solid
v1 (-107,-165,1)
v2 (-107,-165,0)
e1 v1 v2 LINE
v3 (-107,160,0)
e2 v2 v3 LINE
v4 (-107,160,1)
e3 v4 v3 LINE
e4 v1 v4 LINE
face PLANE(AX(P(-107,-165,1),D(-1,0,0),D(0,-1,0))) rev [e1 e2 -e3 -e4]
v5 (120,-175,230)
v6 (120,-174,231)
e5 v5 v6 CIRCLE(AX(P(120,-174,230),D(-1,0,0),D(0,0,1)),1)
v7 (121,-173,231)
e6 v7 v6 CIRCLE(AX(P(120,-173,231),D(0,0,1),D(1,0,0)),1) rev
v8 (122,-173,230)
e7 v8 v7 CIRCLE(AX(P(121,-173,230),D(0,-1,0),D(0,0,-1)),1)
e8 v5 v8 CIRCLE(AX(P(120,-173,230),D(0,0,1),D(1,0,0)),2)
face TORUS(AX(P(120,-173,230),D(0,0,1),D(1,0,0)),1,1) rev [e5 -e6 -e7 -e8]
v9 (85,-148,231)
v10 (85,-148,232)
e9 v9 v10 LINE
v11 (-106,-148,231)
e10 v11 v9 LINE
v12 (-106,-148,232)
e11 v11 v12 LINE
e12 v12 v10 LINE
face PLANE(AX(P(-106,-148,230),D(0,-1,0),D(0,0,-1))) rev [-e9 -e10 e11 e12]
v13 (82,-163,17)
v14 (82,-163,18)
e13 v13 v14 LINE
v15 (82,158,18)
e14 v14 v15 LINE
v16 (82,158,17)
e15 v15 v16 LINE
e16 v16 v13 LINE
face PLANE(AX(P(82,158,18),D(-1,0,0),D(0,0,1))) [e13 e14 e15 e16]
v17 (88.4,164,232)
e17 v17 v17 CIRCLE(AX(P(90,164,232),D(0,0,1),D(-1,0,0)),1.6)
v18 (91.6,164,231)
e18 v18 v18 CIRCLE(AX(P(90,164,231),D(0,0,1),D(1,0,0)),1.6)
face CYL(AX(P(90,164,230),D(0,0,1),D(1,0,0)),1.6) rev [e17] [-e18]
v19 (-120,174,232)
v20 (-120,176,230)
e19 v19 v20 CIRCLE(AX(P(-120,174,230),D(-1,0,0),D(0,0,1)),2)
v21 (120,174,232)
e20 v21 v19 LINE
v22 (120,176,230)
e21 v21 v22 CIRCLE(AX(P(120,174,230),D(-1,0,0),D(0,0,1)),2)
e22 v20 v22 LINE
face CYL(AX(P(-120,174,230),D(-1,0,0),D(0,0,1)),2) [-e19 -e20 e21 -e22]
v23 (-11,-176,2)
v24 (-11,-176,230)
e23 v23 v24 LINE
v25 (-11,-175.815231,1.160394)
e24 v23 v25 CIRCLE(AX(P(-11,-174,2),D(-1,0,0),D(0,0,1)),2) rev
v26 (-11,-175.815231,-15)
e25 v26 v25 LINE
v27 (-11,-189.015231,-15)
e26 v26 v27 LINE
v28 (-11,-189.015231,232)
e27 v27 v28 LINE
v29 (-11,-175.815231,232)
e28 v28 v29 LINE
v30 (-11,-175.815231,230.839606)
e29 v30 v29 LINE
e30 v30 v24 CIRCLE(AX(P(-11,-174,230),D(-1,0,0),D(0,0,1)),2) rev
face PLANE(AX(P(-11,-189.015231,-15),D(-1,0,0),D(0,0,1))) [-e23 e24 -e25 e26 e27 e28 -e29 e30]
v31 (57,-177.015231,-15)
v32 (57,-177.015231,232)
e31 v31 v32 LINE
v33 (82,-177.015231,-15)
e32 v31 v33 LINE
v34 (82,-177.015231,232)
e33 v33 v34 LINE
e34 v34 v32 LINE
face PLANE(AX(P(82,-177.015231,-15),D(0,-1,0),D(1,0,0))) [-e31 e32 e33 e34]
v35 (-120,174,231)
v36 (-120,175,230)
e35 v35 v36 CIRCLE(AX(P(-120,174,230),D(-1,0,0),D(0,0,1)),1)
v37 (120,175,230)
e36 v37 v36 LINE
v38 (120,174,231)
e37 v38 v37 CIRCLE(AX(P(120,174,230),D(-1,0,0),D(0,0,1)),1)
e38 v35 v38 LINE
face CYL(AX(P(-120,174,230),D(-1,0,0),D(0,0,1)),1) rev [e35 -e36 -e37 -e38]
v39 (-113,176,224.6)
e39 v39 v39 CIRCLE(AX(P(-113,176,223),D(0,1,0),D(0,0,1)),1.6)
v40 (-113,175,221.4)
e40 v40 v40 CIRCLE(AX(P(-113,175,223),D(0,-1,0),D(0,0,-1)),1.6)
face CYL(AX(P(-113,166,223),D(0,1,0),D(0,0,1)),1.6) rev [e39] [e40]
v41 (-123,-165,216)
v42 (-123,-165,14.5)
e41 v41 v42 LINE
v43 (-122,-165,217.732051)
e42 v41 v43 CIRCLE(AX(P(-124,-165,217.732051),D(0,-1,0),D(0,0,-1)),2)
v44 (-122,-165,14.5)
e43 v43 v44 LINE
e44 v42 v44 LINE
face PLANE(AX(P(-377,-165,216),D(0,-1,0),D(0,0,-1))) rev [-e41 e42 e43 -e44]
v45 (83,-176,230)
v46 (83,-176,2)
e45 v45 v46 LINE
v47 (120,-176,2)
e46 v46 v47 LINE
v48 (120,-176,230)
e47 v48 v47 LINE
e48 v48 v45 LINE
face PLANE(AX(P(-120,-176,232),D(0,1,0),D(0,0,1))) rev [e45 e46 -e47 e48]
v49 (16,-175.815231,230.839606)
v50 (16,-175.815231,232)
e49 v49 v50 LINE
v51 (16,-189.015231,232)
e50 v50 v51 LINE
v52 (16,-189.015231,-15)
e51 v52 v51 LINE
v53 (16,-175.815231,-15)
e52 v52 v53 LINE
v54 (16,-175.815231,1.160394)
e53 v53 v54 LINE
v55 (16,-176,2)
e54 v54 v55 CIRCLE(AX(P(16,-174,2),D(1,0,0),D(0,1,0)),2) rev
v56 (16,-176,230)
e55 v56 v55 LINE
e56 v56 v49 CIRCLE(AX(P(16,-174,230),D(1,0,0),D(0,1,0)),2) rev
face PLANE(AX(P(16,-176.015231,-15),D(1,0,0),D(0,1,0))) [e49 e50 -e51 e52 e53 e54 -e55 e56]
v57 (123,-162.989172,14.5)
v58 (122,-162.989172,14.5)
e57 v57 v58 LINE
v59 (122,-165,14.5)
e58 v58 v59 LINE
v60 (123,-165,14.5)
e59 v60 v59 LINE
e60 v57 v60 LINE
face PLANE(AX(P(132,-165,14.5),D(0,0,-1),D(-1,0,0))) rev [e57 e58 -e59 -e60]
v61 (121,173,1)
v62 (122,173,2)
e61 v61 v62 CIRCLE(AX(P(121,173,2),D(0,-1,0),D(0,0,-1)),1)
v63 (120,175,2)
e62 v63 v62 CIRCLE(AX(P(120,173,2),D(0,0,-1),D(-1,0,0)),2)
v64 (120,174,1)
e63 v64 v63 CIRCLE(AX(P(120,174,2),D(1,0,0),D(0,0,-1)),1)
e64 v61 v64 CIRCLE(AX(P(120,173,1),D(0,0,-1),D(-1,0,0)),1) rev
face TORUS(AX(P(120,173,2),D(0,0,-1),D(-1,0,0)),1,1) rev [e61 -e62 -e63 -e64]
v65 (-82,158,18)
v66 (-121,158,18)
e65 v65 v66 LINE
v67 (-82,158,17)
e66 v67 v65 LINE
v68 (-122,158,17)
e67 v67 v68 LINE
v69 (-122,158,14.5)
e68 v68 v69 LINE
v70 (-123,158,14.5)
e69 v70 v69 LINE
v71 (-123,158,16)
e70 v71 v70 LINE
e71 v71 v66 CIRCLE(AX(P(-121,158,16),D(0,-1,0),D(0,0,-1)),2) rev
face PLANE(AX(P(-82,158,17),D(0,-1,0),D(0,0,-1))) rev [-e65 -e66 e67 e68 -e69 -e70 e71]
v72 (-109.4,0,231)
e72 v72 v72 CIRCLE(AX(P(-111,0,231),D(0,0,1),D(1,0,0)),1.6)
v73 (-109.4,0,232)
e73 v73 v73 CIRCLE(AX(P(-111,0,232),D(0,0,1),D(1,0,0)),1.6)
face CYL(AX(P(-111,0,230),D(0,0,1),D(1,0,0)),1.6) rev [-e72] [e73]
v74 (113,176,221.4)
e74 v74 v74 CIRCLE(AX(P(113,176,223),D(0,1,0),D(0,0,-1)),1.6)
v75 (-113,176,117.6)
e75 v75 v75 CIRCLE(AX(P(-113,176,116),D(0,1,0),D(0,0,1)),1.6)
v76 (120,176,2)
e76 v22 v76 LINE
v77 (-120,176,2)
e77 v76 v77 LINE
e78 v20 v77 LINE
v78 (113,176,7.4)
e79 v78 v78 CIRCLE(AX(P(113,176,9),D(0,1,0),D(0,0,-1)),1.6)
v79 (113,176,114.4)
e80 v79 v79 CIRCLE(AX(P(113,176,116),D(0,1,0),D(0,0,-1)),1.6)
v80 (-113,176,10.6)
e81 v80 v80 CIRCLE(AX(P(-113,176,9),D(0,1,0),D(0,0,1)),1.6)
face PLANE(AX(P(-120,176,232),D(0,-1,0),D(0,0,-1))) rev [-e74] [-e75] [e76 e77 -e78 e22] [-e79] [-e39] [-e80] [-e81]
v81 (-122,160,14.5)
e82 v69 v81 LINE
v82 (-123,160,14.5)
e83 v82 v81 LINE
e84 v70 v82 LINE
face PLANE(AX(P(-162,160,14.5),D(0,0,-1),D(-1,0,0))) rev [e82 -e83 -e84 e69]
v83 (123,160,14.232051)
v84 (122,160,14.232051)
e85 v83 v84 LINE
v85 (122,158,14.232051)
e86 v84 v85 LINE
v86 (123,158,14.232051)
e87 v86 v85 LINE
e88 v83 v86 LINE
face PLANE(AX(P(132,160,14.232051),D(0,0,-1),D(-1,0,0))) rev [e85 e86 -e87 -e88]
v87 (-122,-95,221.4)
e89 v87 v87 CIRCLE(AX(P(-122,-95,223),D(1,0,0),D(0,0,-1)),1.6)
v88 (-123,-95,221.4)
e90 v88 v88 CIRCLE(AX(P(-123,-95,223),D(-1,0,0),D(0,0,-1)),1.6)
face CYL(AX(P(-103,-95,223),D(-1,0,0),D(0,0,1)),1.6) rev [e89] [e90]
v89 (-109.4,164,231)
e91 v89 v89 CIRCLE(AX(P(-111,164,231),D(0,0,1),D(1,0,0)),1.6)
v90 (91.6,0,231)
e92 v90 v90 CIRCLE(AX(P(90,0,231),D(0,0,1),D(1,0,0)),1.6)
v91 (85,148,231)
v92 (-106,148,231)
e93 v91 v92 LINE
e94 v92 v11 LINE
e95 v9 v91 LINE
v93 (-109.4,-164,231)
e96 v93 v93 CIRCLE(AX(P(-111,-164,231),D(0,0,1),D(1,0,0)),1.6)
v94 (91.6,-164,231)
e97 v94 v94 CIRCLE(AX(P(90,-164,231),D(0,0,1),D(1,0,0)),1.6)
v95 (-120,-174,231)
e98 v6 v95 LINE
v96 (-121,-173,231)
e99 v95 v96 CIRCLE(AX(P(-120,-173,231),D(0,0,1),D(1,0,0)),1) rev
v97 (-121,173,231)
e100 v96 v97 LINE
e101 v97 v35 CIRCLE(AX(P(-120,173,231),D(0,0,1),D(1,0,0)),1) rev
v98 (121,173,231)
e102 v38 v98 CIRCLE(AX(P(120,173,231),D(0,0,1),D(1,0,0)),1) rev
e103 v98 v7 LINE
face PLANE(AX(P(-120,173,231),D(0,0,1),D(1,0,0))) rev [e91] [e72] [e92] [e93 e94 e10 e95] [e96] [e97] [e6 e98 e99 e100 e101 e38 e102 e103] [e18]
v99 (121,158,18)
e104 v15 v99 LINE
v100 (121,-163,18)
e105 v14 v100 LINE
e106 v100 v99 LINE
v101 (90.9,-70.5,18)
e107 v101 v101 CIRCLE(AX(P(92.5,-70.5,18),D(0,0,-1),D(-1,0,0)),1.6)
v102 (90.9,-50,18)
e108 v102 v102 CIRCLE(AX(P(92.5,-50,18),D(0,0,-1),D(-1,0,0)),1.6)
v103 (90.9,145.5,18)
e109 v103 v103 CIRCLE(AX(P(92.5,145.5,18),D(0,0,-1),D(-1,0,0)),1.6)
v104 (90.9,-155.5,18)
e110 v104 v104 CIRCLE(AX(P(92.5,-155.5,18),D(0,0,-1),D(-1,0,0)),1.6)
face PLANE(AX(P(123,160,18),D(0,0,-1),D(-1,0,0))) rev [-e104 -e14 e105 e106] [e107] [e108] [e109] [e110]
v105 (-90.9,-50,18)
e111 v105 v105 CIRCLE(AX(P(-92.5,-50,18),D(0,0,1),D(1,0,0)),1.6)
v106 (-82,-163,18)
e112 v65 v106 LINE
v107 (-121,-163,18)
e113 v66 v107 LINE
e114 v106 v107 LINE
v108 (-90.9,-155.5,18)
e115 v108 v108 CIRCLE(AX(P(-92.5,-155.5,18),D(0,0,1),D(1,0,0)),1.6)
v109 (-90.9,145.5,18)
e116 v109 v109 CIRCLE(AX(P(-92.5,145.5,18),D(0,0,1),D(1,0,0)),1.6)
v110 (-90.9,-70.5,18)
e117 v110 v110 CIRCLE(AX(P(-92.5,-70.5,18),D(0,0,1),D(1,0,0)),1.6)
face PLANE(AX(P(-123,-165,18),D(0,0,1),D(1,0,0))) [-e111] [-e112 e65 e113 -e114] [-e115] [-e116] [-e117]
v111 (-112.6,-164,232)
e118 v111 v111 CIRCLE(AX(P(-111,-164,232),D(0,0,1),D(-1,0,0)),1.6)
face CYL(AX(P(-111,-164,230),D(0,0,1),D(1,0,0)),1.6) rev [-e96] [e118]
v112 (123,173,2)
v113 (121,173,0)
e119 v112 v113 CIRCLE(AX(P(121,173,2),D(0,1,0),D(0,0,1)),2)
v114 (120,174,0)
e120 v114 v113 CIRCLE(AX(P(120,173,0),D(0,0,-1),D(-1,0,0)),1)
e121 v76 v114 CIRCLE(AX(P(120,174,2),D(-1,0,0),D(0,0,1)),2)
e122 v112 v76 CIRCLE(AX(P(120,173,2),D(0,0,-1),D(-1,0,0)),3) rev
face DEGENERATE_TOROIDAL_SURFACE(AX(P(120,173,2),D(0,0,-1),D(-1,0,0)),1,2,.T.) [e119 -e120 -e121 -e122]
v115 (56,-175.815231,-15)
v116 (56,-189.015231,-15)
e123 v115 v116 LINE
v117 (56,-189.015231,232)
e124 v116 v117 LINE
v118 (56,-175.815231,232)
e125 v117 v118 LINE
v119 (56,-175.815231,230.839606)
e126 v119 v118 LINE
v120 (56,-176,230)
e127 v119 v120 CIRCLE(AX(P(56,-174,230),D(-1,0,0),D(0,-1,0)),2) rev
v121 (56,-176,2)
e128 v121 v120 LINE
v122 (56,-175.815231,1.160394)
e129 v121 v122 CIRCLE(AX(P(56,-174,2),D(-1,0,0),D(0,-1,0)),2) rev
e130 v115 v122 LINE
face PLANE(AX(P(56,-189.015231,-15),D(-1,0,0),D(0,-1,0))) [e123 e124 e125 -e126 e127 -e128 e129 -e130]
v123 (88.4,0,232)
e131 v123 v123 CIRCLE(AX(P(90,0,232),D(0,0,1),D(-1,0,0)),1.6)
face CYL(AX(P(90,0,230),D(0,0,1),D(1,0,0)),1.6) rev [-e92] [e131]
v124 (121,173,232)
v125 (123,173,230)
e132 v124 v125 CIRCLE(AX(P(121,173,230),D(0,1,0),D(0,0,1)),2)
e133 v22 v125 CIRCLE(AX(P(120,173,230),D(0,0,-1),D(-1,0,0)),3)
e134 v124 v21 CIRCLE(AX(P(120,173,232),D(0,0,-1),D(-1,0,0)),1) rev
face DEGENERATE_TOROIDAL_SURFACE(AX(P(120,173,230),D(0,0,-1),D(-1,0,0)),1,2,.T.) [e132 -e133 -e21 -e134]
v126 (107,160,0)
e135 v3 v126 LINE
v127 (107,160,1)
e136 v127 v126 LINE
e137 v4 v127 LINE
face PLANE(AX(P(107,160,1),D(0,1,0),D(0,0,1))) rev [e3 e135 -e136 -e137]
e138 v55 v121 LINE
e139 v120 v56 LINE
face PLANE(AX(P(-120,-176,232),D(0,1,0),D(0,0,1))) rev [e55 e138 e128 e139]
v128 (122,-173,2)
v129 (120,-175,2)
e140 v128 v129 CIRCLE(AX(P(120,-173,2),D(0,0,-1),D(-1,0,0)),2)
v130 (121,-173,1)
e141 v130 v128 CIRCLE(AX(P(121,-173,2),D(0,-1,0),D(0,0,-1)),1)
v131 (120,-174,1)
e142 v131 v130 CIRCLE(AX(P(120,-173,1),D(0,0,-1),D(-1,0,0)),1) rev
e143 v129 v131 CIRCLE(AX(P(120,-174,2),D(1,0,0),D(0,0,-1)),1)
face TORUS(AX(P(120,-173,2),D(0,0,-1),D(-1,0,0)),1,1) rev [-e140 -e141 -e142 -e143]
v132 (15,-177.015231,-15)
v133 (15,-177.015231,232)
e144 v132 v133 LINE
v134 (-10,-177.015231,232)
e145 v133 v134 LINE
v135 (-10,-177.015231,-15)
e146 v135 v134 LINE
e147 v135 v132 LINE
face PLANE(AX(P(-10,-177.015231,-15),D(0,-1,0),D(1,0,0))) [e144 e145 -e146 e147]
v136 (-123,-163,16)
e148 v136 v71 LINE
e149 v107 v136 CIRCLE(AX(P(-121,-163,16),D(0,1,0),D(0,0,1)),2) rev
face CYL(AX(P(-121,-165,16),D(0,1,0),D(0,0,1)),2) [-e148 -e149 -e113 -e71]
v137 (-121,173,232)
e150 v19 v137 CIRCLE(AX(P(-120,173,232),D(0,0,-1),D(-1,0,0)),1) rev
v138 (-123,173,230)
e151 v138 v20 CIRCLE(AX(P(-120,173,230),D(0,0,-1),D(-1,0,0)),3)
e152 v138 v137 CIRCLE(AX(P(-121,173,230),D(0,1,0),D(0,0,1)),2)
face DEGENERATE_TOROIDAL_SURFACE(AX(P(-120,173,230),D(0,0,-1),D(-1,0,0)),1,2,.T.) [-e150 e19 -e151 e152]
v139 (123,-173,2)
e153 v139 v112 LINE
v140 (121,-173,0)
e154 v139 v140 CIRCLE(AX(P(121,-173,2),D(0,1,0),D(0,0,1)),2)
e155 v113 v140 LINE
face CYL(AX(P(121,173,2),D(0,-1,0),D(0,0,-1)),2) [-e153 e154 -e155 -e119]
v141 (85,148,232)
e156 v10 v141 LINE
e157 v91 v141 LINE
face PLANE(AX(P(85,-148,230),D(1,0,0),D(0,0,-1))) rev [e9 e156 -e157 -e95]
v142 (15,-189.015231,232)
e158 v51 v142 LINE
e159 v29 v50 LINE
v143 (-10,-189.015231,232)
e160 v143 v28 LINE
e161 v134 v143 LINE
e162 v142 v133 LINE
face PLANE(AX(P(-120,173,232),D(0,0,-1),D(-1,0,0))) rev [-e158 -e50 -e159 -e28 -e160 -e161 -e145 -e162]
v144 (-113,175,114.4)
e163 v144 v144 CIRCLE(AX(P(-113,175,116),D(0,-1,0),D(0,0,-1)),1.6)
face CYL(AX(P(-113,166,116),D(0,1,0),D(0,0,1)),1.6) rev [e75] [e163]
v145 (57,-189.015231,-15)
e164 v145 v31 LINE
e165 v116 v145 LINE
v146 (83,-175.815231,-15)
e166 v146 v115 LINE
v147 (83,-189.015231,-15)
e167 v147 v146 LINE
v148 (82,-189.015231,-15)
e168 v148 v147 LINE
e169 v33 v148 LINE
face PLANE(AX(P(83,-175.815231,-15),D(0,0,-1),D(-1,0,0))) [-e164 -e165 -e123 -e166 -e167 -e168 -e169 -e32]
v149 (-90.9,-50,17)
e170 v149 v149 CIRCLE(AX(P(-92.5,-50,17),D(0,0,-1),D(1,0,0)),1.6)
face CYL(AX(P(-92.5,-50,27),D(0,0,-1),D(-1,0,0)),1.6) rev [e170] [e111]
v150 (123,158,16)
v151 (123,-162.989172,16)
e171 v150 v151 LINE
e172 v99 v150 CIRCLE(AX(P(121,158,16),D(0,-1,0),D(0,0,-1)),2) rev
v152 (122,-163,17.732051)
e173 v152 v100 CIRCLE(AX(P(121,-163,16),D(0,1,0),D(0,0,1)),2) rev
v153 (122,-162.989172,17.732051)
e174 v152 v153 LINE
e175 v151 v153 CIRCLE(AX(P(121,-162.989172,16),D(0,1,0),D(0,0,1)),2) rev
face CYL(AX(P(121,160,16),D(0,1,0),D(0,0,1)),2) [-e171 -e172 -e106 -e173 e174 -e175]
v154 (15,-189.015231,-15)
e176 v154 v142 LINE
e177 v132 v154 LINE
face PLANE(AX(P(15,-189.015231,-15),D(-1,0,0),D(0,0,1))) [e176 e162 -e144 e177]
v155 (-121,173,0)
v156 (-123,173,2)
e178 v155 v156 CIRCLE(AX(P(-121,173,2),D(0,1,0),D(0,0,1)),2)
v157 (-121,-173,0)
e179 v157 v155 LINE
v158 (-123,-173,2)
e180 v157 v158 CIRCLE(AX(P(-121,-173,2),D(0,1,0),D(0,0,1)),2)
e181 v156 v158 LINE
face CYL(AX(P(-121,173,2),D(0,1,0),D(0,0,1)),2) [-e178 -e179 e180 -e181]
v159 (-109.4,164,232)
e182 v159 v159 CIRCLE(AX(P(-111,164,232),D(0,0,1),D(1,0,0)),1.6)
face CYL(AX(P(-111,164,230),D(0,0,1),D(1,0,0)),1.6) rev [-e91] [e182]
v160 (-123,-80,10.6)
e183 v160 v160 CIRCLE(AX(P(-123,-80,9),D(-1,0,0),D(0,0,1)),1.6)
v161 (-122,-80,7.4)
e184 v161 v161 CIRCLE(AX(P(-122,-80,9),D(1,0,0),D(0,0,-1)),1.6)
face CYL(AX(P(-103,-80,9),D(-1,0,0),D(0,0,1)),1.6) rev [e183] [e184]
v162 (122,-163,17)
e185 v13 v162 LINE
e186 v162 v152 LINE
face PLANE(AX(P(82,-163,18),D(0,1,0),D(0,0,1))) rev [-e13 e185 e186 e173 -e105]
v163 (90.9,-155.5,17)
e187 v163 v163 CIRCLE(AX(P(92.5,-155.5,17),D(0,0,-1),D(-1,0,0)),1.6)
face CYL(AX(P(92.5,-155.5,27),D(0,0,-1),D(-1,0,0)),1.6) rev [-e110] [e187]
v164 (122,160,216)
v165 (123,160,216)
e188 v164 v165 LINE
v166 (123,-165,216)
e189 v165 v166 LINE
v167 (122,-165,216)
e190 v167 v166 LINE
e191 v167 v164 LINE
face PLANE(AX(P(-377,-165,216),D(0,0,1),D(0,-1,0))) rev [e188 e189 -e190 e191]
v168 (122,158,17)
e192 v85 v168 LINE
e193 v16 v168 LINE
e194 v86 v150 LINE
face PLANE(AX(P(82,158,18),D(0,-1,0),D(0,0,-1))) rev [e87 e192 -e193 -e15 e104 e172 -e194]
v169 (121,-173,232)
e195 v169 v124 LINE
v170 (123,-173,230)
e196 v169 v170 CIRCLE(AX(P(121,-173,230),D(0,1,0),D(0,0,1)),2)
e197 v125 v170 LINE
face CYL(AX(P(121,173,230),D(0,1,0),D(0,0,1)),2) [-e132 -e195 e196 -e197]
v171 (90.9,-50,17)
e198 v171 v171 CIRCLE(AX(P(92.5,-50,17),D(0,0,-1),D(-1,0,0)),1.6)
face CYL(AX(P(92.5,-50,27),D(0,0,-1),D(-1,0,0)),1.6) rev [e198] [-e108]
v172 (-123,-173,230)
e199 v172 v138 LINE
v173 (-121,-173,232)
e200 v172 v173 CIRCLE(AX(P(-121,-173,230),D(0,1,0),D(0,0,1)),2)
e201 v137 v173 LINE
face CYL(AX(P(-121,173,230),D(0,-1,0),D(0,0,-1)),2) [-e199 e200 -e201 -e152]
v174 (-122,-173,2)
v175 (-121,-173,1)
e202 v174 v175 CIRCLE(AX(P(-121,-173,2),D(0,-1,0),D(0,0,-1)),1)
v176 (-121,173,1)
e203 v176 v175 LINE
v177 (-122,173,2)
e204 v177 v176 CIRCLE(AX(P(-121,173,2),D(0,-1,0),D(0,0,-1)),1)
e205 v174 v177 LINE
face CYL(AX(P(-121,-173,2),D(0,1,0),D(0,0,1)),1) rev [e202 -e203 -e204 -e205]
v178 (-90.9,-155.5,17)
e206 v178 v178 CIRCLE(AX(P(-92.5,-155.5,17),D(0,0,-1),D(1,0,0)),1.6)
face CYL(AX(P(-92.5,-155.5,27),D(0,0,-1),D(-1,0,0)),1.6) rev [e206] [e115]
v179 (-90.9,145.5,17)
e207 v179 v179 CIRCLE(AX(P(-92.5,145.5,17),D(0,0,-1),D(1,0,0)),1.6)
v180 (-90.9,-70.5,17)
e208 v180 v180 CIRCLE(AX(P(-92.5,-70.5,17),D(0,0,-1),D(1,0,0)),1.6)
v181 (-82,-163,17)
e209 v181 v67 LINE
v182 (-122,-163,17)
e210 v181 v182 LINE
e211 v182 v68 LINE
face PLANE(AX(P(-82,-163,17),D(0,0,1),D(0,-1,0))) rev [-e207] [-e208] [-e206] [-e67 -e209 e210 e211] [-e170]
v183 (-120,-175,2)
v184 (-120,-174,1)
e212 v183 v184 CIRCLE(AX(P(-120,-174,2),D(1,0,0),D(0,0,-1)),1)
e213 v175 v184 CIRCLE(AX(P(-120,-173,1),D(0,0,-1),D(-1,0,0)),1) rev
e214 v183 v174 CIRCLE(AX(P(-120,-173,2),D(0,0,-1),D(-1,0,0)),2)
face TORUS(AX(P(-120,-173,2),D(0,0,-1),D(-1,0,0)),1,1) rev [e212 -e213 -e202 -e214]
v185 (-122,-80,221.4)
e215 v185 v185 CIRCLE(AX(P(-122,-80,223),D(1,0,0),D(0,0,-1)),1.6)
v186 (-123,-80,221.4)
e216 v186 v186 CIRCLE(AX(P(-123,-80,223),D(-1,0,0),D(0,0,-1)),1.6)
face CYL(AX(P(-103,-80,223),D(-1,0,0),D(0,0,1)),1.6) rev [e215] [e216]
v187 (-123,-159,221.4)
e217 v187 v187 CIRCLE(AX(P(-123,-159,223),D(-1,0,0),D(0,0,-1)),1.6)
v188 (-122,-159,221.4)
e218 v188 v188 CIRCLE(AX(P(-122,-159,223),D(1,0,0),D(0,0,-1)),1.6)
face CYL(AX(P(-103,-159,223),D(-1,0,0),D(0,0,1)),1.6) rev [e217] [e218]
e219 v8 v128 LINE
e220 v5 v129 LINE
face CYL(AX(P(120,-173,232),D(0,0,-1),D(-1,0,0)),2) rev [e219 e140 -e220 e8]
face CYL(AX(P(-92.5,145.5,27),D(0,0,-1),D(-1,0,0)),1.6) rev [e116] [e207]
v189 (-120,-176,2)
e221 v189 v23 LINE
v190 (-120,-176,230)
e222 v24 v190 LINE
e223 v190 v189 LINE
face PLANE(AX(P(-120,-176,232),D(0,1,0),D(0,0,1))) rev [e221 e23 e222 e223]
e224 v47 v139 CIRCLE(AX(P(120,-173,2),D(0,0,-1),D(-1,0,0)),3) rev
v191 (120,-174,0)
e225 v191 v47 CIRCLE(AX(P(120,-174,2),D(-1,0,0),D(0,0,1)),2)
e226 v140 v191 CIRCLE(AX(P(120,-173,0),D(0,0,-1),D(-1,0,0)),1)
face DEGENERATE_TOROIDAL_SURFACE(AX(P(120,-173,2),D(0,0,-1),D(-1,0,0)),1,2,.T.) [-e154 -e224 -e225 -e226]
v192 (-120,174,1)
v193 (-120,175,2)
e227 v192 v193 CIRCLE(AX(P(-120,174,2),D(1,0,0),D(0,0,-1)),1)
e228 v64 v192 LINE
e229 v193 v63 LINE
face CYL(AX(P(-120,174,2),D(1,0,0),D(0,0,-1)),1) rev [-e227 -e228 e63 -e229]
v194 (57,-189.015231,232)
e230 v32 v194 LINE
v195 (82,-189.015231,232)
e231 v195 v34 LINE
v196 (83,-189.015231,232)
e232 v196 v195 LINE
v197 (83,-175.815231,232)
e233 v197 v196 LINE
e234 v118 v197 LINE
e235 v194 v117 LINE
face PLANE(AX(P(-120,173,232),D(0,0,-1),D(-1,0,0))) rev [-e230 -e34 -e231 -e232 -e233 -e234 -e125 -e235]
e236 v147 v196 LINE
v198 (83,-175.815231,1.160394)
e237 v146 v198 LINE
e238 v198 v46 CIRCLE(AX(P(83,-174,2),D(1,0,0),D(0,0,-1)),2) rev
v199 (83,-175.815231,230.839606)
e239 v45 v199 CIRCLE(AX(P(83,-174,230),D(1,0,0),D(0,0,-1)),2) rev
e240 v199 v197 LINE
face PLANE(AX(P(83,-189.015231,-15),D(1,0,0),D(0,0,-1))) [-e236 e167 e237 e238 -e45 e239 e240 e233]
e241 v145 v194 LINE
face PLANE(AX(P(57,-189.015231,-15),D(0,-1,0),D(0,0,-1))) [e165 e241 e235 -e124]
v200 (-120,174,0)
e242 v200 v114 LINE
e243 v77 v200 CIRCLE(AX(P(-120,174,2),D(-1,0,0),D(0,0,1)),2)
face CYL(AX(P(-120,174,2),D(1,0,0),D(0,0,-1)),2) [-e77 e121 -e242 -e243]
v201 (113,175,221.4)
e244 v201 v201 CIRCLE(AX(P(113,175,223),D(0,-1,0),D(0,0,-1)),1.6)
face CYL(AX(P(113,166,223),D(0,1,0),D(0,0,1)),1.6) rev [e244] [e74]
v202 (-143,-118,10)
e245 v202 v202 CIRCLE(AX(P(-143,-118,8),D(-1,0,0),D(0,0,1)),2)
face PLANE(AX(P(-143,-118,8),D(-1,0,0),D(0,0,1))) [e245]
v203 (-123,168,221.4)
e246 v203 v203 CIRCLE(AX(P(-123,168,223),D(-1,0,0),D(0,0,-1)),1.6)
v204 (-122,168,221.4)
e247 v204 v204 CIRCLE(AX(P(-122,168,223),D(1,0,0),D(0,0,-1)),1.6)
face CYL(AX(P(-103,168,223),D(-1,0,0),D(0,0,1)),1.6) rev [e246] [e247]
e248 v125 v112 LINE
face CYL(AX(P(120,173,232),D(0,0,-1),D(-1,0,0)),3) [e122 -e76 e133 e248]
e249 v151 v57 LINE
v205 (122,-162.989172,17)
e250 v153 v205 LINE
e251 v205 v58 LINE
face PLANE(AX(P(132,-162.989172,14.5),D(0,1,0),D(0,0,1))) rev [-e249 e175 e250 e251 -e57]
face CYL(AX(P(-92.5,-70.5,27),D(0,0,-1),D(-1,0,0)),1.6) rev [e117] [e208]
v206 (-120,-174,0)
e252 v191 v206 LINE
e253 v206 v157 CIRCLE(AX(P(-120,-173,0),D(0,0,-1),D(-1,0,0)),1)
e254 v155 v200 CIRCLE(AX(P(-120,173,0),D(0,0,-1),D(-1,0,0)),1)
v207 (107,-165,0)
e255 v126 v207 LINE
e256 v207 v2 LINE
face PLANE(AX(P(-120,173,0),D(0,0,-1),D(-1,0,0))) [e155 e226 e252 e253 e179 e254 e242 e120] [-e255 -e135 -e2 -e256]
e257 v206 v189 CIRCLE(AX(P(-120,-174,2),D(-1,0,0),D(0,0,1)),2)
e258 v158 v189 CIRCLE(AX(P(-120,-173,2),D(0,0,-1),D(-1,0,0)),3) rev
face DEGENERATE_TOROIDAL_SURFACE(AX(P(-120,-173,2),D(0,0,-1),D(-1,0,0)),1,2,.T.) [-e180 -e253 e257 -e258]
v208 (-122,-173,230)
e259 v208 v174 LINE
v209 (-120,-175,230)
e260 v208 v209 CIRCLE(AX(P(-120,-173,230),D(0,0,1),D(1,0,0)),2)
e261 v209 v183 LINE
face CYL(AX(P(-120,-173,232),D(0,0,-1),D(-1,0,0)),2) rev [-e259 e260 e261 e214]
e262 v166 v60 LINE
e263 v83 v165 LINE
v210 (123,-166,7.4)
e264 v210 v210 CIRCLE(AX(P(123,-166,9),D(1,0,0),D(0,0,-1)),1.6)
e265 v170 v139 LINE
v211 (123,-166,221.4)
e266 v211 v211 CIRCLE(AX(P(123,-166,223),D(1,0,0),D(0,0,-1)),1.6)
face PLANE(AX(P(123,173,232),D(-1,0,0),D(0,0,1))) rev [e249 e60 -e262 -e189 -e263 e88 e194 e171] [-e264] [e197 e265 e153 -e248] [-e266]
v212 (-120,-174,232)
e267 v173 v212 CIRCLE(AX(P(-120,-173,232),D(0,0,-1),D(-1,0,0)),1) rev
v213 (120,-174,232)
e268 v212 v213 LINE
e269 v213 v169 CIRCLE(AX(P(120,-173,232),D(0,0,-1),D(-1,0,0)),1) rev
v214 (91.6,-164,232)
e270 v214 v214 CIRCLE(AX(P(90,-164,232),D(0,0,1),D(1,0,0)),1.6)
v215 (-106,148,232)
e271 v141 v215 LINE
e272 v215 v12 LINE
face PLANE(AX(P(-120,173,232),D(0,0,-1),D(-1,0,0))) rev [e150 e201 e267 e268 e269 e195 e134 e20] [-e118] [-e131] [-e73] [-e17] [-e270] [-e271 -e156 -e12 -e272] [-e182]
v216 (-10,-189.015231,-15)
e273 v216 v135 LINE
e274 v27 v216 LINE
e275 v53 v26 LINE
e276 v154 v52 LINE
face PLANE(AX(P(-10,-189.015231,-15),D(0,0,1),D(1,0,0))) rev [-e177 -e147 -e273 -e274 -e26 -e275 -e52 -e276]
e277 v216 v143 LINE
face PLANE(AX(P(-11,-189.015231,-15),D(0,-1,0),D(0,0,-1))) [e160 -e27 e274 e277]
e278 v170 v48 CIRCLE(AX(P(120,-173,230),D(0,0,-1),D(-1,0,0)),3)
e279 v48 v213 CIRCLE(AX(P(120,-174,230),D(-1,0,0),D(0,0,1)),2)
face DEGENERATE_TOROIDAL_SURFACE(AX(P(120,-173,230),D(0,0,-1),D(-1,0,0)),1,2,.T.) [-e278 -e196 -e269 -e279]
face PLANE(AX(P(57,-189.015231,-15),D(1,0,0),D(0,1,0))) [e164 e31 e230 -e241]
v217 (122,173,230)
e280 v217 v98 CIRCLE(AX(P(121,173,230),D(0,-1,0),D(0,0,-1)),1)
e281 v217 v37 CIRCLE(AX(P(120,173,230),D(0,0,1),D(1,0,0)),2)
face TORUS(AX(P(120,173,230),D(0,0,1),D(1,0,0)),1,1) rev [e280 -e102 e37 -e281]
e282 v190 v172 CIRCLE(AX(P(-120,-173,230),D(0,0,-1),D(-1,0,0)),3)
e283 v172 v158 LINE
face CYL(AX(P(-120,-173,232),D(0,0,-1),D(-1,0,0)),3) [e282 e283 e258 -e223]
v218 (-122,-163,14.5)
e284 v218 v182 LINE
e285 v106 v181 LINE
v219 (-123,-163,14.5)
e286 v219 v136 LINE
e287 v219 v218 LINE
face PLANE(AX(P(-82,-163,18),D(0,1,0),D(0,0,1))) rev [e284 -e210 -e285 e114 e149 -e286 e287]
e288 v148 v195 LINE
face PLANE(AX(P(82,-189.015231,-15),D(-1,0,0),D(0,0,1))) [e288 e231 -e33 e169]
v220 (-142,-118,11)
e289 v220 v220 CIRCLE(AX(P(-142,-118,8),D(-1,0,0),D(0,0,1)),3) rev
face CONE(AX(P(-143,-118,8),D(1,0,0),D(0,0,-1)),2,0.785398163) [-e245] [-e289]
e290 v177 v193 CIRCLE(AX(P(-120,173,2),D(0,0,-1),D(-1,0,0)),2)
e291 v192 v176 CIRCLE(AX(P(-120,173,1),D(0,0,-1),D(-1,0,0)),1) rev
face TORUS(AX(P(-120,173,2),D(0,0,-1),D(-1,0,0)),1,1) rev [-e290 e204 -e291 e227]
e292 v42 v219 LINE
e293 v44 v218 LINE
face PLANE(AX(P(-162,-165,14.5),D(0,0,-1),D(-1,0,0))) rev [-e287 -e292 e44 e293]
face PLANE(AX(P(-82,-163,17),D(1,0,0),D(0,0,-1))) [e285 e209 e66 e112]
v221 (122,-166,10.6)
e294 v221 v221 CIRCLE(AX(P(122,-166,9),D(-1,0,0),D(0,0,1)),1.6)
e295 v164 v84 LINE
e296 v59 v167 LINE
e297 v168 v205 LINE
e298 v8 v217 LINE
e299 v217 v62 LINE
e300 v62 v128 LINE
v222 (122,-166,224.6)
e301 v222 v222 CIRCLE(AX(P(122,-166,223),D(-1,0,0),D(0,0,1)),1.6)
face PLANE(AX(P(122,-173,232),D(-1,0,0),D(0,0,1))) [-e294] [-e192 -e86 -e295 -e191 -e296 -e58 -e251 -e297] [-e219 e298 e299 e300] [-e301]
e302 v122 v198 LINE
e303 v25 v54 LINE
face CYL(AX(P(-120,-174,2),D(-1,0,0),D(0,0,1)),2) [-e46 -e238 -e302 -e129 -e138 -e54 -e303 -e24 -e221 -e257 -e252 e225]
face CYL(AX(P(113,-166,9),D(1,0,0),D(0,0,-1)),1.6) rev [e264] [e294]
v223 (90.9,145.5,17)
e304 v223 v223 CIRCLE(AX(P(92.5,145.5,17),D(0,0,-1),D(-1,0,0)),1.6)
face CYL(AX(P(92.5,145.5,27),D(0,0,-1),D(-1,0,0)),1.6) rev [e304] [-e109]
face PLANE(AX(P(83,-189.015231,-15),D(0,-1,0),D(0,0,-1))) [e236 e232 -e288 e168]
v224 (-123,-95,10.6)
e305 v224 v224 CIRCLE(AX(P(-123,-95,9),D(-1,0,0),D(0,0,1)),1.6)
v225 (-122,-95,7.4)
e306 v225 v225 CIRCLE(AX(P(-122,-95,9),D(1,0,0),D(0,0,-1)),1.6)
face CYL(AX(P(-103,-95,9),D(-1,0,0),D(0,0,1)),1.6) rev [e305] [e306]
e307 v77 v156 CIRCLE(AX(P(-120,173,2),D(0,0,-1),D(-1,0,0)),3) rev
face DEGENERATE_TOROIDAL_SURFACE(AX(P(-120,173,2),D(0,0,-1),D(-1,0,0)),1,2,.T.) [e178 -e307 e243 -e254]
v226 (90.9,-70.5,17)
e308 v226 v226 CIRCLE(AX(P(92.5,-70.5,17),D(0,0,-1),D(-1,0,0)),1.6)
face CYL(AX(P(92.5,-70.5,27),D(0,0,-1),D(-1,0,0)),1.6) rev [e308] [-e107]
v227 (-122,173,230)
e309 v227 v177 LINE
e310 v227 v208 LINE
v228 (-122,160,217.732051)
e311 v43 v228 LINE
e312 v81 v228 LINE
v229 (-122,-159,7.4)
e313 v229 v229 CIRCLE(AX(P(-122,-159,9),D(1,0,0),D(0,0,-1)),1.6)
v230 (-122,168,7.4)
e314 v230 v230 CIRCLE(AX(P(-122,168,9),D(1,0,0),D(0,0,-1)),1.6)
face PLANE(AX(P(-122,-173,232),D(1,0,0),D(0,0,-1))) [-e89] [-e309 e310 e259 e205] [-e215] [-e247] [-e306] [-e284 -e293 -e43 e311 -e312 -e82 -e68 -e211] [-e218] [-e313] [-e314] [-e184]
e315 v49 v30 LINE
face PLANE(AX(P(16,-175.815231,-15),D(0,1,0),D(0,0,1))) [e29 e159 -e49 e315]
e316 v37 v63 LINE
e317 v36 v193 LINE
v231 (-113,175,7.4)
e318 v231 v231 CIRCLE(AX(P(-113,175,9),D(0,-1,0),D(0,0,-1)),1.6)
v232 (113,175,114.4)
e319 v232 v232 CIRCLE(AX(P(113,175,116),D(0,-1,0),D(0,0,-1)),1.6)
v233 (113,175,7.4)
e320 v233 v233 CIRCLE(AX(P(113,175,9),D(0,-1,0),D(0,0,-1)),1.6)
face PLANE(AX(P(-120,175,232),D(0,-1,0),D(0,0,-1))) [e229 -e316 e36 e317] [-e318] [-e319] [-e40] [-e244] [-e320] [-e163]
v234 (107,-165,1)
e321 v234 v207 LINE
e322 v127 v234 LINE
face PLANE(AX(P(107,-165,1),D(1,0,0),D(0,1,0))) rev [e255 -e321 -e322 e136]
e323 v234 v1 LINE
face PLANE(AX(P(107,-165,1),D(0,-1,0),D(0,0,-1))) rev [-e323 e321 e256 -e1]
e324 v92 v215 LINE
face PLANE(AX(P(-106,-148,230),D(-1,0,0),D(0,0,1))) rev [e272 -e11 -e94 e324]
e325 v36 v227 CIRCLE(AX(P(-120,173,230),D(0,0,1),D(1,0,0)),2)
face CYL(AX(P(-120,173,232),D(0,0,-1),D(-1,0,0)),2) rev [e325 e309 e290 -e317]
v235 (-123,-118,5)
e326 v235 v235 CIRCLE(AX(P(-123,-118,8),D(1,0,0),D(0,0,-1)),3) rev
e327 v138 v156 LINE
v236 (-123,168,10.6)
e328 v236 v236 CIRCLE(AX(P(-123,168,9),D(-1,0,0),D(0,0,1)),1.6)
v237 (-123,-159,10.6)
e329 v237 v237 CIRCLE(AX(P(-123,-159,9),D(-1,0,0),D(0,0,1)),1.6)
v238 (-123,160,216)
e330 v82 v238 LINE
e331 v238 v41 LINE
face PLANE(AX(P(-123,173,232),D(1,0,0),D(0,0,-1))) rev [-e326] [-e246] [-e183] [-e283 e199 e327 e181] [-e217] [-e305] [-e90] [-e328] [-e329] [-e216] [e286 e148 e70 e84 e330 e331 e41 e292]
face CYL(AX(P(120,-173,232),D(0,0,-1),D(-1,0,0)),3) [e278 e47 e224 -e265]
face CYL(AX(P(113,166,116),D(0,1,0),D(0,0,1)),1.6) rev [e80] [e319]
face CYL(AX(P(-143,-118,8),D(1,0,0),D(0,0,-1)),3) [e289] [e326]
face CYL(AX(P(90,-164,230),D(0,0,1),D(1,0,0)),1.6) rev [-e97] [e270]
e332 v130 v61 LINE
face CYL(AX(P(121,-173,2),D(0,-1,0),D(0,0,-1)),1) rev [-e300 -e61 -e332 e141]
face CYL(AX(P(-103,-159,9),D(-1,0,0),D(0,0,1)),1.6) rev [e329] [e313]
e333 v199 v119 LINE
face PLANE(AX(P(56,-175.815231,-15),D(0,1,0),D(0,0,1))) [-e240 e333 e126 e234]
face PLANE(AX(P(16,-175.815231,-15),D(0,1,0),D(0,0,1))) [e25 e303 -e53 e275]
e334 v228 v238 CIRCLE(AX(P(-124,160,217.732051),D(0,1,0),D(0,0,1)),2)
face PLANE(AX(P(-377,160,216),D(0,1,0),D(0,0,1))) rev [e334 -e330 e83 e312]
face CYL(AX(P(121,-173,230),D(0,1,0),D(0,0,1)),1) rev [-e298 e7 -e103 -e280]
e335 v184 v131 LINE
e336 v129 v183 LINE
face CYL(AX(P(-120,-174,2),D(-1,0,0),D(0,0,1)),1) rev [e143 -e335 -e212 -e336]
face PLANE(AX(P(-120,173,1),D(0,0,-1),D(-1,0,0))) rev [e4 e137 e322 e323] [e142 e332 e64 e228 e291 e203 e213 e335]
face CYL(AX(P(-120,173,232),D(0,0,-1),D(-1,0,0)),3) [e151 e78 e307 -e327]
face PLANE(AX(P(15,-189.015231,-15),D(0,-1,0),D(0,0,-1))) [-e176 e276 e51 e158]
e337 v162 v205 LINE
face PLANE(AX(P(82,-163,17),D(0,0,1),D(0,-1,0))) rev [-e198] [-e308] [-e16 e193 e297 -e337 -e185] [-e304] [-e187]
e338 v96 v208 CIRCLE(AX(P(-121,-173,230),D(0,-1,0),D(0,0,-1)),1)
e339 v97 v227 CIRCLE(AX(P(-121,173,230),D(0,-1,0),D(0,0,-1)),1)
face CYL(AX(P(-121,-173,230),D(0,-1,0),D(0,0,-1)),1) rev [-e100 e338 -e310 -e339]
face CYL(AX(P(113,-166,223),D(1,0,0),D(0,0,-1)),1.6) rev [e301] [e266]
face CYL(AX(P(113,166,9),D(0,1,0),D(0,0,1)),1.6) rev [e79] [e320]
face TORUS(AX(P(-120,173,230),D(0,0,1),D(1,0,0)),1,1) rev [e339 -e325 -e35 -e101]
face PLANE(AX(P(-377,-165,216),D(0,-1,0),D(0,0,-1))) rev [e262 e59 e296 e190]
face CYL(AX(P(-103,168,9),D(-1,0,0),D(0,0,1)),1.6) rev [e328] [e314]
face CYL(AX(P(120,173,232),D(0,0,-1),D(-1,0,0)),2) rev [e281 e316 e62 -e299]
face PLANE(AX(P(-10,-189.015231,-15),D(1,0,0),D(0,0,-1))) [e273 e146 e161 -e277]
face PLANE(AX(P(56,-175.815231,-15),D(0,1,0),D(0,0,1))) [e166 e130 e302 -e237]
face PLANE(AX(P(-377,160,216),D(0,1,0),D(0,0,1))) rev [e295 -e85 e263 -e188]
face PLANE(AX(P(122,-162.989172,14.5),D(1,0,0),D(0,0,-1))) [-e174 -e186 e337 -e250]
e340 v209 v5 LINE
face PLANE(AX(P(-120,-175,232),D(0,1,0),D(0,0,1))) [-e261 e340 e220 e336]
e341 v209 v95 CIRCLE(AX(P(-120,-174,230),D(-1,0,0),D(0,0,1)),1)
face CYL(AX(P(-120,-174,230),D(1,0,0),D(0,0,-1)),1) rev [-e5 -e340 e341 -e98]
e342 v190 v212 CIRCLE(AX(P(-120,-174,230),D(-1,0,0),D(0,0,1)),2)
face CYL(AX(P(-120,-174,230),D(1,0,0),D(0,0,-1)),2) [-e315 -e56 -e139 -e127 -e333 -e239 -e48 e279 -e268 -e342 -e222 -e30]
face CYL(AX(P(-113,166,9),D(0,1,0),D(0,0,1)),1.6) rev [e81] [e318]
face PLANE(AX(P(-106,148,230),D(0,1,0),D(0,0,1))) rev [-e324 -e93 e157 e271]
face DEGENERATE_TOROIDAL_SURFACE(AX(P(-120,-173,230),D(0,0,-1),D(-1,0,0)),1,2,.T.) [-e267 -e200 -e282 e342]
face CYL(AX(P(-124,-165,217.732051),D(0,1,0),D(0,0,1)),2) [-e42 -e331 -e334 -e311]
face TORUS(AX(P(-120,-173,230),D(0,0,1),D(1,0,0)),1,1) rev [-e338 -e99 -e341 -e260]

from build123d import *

# Parameters (mm, degrees)
EXTRUDE_1_DEPTH             = 232
SKETCH_2_W                  = 200
SKETCH_2_H                  = 325
CUT_EXTRUDE_1_DEPTH         = 500
EXTRUDE_START               = -1
EXTRUDE_1_2_DEPTH           = 1
SKETCH_4_W                  = 214
SKETCH_4_H                  = 325
EXTRUDE_2_DEPTH             = 1
FILLET_1_R                  = 1
FILLET_2_R                  = 2
SKETCH_6_R                  = 3
EXTRUDE_3_DEPTH             = 20
CHAMFER_1_SIZE              = 1
SKETCH_7_R                  = 1.6
CUT_EXTRUDE_3_DEPTH         = 20
SKETCH_8_W                  = 191
SKETCH_8_H                  = 296
CUT_EXTRUDE_4_DEPTH         = 2
SKETCH_9_R                  = 1.6
CUT_EXTRUDE_5_DEPTH         = 2
EXTRUDE_6_REACH             = 396.406
EXTRUDE_6_DIRECTION_2_DEPTH = 15
SKETCH_16_W                 = 1
SKETCH_16_H                 = 325
EXTRUDE_9_DEPTH             = 2
SKETCH_17_W                 = 1
SKETCH_17_H                 = 321
EXTRUDE_10_DEPTH            = 40
SKETCH_18_W                 = 1
SKETCH_18_H                 = 321
EXTRUDE_11_DEPTH            = 40
SKETCH_19_W                 = 3.5
SKETCH_19_H                 = 2
CUT_EXTRUDE_8_DEPTH         = 40
SKETCH_20_R                 = 1.6
CUT_EXTRUDE_9_DEPTH         = 10
FILLET_4_R                  = 2
SKETCH_22_W                 = 4.75100146
SKETCH_22_H                 = 2.010828375
SKETCH_22_W_2               = 3.5
SKETCH_22_H_2               = 2
CUT_EXTRUDE_11_DEPTH        = 10
SKETCH_23_R                 = 1.6
CUT_EXTRUDE_12_DEPTH        = 10
SKETCH_24_R                 = 1.6
CUT_EXTRUDE_13_DEPTH        = 10


with BuildPart() as part:
    # Эскиз1 → Extrude 1 (new body)
    with BuildSketch(Plane.XY):
        with BuildLine():
            Line((123, -173), (123, 173))
            ThreePointArc((123, 173), (122.121320344, 175.121320344), (120, 176))
            Line((120, 176), (-120, 176))
            ThreePointArc((-120, 176), (-122.121320344, 175.121320344), (-123, 173))
            Line((-123, 173), (-123, -173))
            ThreePointArc((-123, -173), (-122.121320344, -175.121320344), (-120, -176))
            Line((-120, -176), (120, -176))
            ThreePointArc((120, -176), (122.121320344, -175.121320344), (123, -173))
        make_face()
        with BuildLine():
            Line((122, -173), (122, 173))
            ThreePointArc((122, 173), (121.414213562, 174.414213562), (120, 175))
            Line((120, 175), (-120, 175))
            ThreePointArc((-120, 175), (-121.414213562, 174.414213562), (-122, 173))
            Line((-122, 173), (-122, -173))
            ThreePointArc((-122, -173), (-121.414213562, -174.414213562), (-120, -175))
            Line((-120, -175), (120, -175))
            ThreePointArc((120, -175), (121.414213562, -174.414213562), (122, -173))
        make_face(mode=Mode.SUBTRACT)
    extrude(amount=EXTRUDE_1_DEPTH)

    # Эскиз2 → Вырез-Вытянуть1 (cut)
    with BuildSketch(Plane(origin=(123, 0, 0), x_dir=(0, 0, -1), z_dir=(1, 0, 0))):
        with Locations((-116, -2.5)):
            Rectangle(SKETCH_2_W, SKETCH_2_H)
    extrude(amount=-CUT_EXTRUDE_1_DEPTH, mode=Mode.SUBTRACT)

    # Эскиз3 → Extrude 1 2 (add)
    with BuildSketch(Plane.XY.offset(232).offset(EXTRUDE_START)):
        with BuildLine():
            Line((-123, 173), (-123, -173))
            ThreePointArc((-123, -173), (-122.121320344, -175.121320344), (-120, -176))
            Line((-120, -176), (120, -176))
            ThreePointArc((120, -176), (122.121320344, -175.121320344), (123, -173))
            Line((123, -173), (123, 173))
            ThreePointArc((123, 173), (122.121320344, 175.121320344), (120, 176))
            Line((120, 176), (-120, 176))
            ThreePointArc((-120, 176), (-122.121320344, 175.121320344), (-123, 173))
        make_face()
    extrude(amount=EXTRUDE_1_2_DEPTH)

    # Эскиз4 → Вытянуть2 (add)
    with BuildSketch(Plane(origin=(0, 0, 0), x_dir=(-1, 0, 0), z_dir=(0, 0, -1))):
        with BuildLine():
            Line((120, 176), (-120, 176))
            ThreePointArc((-120, 176), (-122.121320344, 175.121320344), (-123, 173))
            Line((-123, 173), (-123, -173))
            ThreePointArc((-123, -173), (-122.121320344, -175.121320344), (-120, -176))
            Line((-120, -176), (120, -176))
            ThreePointArc((120, -176), (122.121320344, -175.121320344), (123, -173))
            Line((123, -173), (123, 173))
            ThreePointArc((123, 173), (122.121320344, 175.121320344), (120, 176))
        make_face()
        with Locations((0, -2.5)):
            Rectangle(SKETCH_4_W, SKETCH_4_H, mode=Mode.SUBTRACT)
    extrude(amount=-EXTRUDE_2_DEPTH)

    # Скругление1
    fillet_1_edges = [part.edges().sort_by_distance(p)[0] for p in [
        (-122, 0, 1),
        (-121.414213562, 174.414213562, 1),
        (0, 175, 1),
        (121.414213562, 174.414213562, 1),
        (122, 0, 1),
        (121.414213562, -174.414213562, 1),
        (0, -175, 1),
        (-121.414213562, -174.414213562, 1),
        (0, 175, 231),
        (-121.414213562, 174.414213562, 231),
        (-122, 0, 231),
        (-121.414213562, -174.414213562, 231),
        (0, -175, 231),
        (121.414213562, -174.414213562, 231),
        (122, 0, 231),
        (121.414213562, 174.414213562, 231),
    ]]
    fillet(fillet_1_edges, radius=FILLET_1_R)

    # Скругление2
    fillet_2_edges = [part.edges().sort_by_distance(p)[0] for p in [
        (-122.121320344, -175.121320344, 232),
        (0, -176, 232),
        (122.121320344, -175.121320344, 232),
        (123, 0, 232),
        (122.121320344, 175.121320344, 232),
        (0, 176, 232),
        (-122.121320344, 175.121320344, 232),
        (0, 176, 0),
        (122.121320344, 175.121320344, 0),
        (123, 0, 0),
        (122.121320344, -175.121320344, 0),
        (0, -176, 0),
        (-122.121320344, -175.121320344, 0),
        (-123, 0, 0),
        (-122.121320344, 175.121320344, 0),
        (-123, 0, 232),
    ]]
    fillet(fillet_2_edges, radius=FILLET_2_R)

    # Эскиз6 → Вытянуть3 (add)
    with BuildSketch(Plane.ZY.offset(123)):
        with Locations(Location((8, -118, 0), (0, 0, 180))):
            Circle(SKETCH_6_R)
    extrude(amount=EXTRUDE_3_DEPTH)

    # Фаска1
    chamfer_1_edges = [part.edges().sort_by_distance(p)[0] for p in [
        (-143, -118, 11),
    ]]
    chamfer(chamfer_1_edges, length=CHAMFER_1_SIZE)

    # Эскиз7 → Вырез-Вытянуть3 (cut)
    with BuildSketch(Plane.ZY.offset(123)):
        with Locations((9, -95)):
            Circle(SKETCH_7_R)
        with Locations((9, -159)):
            Circle(SKETCH_7_R)
        with Locations(Location((223, -95, 0), (0, 0, 180))):
            Circle(SKETCH_7_R)
        with Locations(Location((223, -159, 0), (0, 0, 180))):
            Circle(SKETCH_7_R)
        with Locations((9, -80)):
            Circle(SKETCH_7_R)
        with Locations(Location((223, -80, 0), (0, 0, 180))):
            Circle(SKETCH_7_R)
        with Locations((9, 168)):
            Circle(SKETCH_7_R)
        with Locations(Location((223, 168, 0), (0, 0, 180))):
            Circle(SKETCH_7_R)
    extrude(amount=-CUT_EXTRUDE_3_DEPTH, mode=Mode.SUBTRACT)

    # Эскиз8 → Вырез-Вытянуть4 (cut)
    with BuildSketch(Plane.XY.offset(232)):
        with Locations((-10.5, 0)):
            Rectangle(SKETCH_8_W, SKETCH_8_H)
    extrude(amount=-CUT_EXTRUDE_4_DEPTH, mode=Mode.SUBTRACT)

    # Эскиз9 → Вырез-Вытянуть5 (cut)
    with BuildSketch(Plane.XY.offset(232)):
        with Locations((-111, 164)):
            Circle(SKETCH_9_R)
        with Locations((-111, 0)):
            Circle(SKETCH_9_R)
        with Locations((-111, -164)):
            Circle(SKETCH_9_R)
        with Locations((90, -164)):
            Circle(SKETCH_9_R)
        with Locations((90, 0)):
            Circle(SKETCH_9_R)
        with Locations((90, 164)):
            Circle(SKETCH_9_R)
    extrude(amount=-CUT_EXTRUDE_5_DEPTH, mode=Mode.SUBTRACT)

    # Вытянуть6: up to this face of the body (flat: up to its plane)
    extrude_6_end = Plane(part.part.faces().sort_by_distance((-117.709874725, -170.709874725, 232))[0])
    # Эскиз10 → Вытянуть6 (add, up to the picked face)
    with BuildSketch(Plane(origin=(123, 0, 0), x_dir=(1, 0, 0), z_dir=(0, 0, 1)), mode=Mode.PRIVATE) as extrude_6_sk1:
        Polygon((-134, -176.015230639), (-134, -175.815230639), (-107, -175.815230639), (-107, -176.015230639), (-107, -189.015230639), (-108, -189.015230639), (-108, -177.015230639), (-133, -177.015230639), (-133, -189.015230639), (-134, -189.015230639), align=None)
    extrude_6_tool1 = split(extrude(extrude_6_sk1.sketch, amount=EXTRUDE_6_REACH, mode=Mode.PRIVATE), bisect_by=extrude_6_end, keep=Keep.BOTH, mode=Mode.PRIVATE)
    # Эскиз10 → Вытянуть6 (add, up to the picked face)
    with BuildSketch(Plane(origin=(123, 0, 0), x_dir=(1, 0, 0), z_dir=(0, 0, 1)), mode=Mode.PRIVATE) as extrude_6_sk2:
        Polygon((-67, -176.015230639), (-67, -175.815230639), (-40, -175.815230639), (-40, -176.015230639), (-40, -189.015230639), (-41, -189.015230639), (-41, -177.015230639), (-66, -177.015230639), (-66, -189.015230639), (-67, -189.015230639), align=None)
    extrude_6_tool2 = split(extrude(extrude_6_sk2.sketch, amount=EXTRUDE_6_REACH, mode=Mode.PRIVATE), bisect_by=extrude_6_end, keep=Keep.BOTH, mode=Mode.PRIVATE)
    add(extrude_6_tool1.solids().sort_by(Axis((-10.69946, -175.915231, 0), (0, 0, 1)))[0])
    add(extrude_6_tool2.solids().sort_by(Axis((56.30054, -175.915231, 0), (0, 0, 1)))[0])

    # Эскиз10 → Вытянуть6 direction 2 (add)
    with BuildSketch(Plane(origin=(123, 0, 0), x_dir=(1, 0, 0), z_dir=(0, 0, 1))):
        Polygon((-134, -176.015230639), (-134, -175.815230639), (-107, -175.815230639), (-107, -176.015230639), (-107, -189.015230639), (-108, -189.015230639), (-108, -177.015230639), (-133, -177.015230639), (-133, -189.015230639), (-134, -189.015230639), align=None)
        Polygon((-67, -176.015230639), (-67, -175.815230639), (-40, -175.815230639), (-40, -176.015230639), (-40, -189.015230639), (-41, -189.015230639), (-41, -177.015230639), (-66, -177.015230639), (-66, -189.015230639), (-67, -189.015230639), align=None)
    extrude(amount=-EXTRUDE_6_DIRECTION_2_DEPTH)

    # Эскиз16 → Вытянуть9 (add)
    with BuildSketch(Plane.XY.offset(16)):
        with Locations((122.5, -2.5)):
            Rectangle(SKETCH_16_W, SKETCH_16_H)
        with Locations((-122.5, -2.5)):
            Rectangle(SKETCH_16_W, SKETCH_16_H)
    extrude(amount=EXTRUDE_9_DEPTH)

    # Эскиз17 → Вытянуть10 (add)
    with BuildSketch(Plane.ZY.offset(-122)):
        with Locations((17.5, -2.5)):
            Rectangle(SKETCH_17_W, SKETCH_17_H)
    extrude(amount=EXTRUDE_10_DEPTH)

    # Эскиз18 → Вытянуть11 (add)
    with BuildSketch(Plane(origin=(-122, 0, 0), x_dir=(0, 0, -1), z_dir=(1, 0, 0))):
        with Locations((-17.5, -2.5)):
            Rectangle(SKETCH_18_W, SKETCH_18_H)
    extrude(amount=EXTRUDE_11_DEPTH)

    # Эскиз19 → Вырез-Вытянуть8 (cut)
    with BuildSketch(Plane(origin=(-122, 0, 0), x_dir=(0, 0, -1), z_dir=(1, 0, 0))):
        with Locations((-16.25, -164)):
            Rectangle(SKETCH_19_W, SKETCH_19_H)
        with Locations((-16.25, 159)):
            Rectangle(SKETCH_19_W, SKETCH_19_H)
    extrude(amount=-CUT_EXTRUDE_8_DEPTH, mode=Mode.SUBTRACT)

    # Эскиз20 → Вырез-Вытянуть9 (cut)
    with BuildSketch(Plane(origin=(0, 0, 17), x_dir=(-1, 0, 0), z_dir=(0, 0, -1))):
        with Locations((-92.5, 145.5)):
            Circle(SKETCH_20_R)
        with Locations((-92.5, -50)):
            Circle(SKETCH_20_R)
        with Locations((-92.5, -155.5)):
            Circle(SKETCH_20_R)
        with Locations(Location((92.5, -155.5, 0), (0, 0, 180))):
            Circle(SKETCH_20_R)
        with Locations(Location((92.5, -50, 0), (0, 0, 180))):
            Circle(SKETCH_20_R)
        with Locations(Location((92.5, 145.5, 0), (0, 0, 180))):
            Circle(SKETCH_20_R)
        with Locations((-92.5, -70.5)):
            Circle(SKETCH_20_R)
        with Locations(Location((92.5, -70.5, 0), (0, 0, 180))):
            Circle(SKETCH_20_R)
    extrude(amount=-CUT_EXTRUDE_9_DEPTH, mode=Mode.SUBTRACT)

    # Скругление4
    # the kernel refuses this fillet: 2 mm, written as the material it takes off along each edge
    with BuildSketch(Plane(origin=(123, -165, 18), x_dir=(0, 0, -1), z_dir=(0, 1, 0))) as fillet_4_piece_1:
        with BuildLine():
            CenterArc((FILLET_4_R, FILLET_4_R), FILLET_4_R, 180, 90)
            Line((0, FILLET_4_R), (0, 0))
            Line((0, 0), (FILLET_4_R, 0))
        make_face()
    extrude(amount=325, mode=Mode.SUBTRACT)
    with BuildSketch(Plane(origin=(-123, 158, 18), x_dir=(0, 0, -1), z_dir=(0, -1, 0))) as fillet_4_piece_2_section:
        with BuildLine():
            CenterArc((FILLET_4_R, FILLET_4_R), FILLET_4_R, 180, 90)
            Line((0, FILLET_4_R), (0, 0))
            Line((0, 0), (FILLET_4_R, 0))
        make_face()
    fillet_4_piece_2 = extrude(amount=326, mode=Mode.PRIVATE)
    fillet_4_piece_2 = split(fillet_4_piece_2, bisect_by=Plane(origin=(-122.64320814, -165, 17.511950301), z_dir=(0, 1, 0)), keep=Keep.TOP, mode=Mode.PRIVATE)
    add(fillet_4_piece_2, mode=Mode.SUBTRACT)
    with BuildSketch(Plane(origin=(-122, 160, 216), x_dir=(-1, 0, 0), z_dir=(0, -1, 0))) as fillet_4_piece_3:
        with BuildLine():
            CenterArc((2, -1.732050808), FILLET_4_R, 120, 60)
            Line((0, -1.732050808), (0, 0))
            Line((0, 0), (1, 0))
        make_face()
    extrude(amount=325, mode=Mode.SUBTRACT)

    # Эскиз22 → Вырез-Вытянуть11 (cut)
    with BuildSketch(Plane.ZY.offset(-122)):
        with Locations((16.87550073, -163.994585813)):
            Rectangle(SKETCH_22_W, SKETCH_22_H)
        with Locations((15.982050808, 159)):
            Rectangle(SKETCH_22_W_2, SKETCH_22_H_2)
    extrude(amount=-CUT_EXTRUDE_11_DEPTH, mode=Mode.SUBTRACT)

    # Эскиз23 → Вырез-Вытянуть12 (cut)
    with BuildSketch(Plane(origin=(0, 176, 0), x_dir=(1, 0, 0), z_dir=(0, 1, 0))):
        with Locations(Location((-113, -223, 0), (0, 0, 270))):
            Circle(SKETCH_23_R)
        with Locations(Location((-113, -116, 0), (0, 0, 270))):
            Circle(SKETCH_23_R)
        with Locations(Location((-113, -9, 0), (0, 0, 270))):
            Circle(SKETCH_23_R)
        with Locations(Location((113, -223, 0), (0, 0, 90))):
            Circle(SKETCH_23_R)
        with Locations(Location((113, -116, 0), (0, 0, 90))):
            Circle(SKETCH_23_R)
        with Locations(Location((113, -9, 0), (0, 0, 90))):
            Circle(SKETCH_23_R)
    extrude(amount=-CUT_EXTRUDE_12_DEPTH, mode=Mode.SUBTRACT)

    # Эскиз24 → Вырез-Вытянуть13 (cut)
    with BuildSketch(Plane(origin=(123, 0, 0), x_dir=(0, 0, -1), z_dir=(1, 0, 0))):
        with Locations((-9, -166)):
            Circle(SKETCH_24_R)
        with Locations((-223, -166)):
            Circle(SKETCH_24_R)
    extrude(amount=-CUT_EXTRUDE_13_DEPTH, mode=Mode.SUBTRACT)


solid = part.part
